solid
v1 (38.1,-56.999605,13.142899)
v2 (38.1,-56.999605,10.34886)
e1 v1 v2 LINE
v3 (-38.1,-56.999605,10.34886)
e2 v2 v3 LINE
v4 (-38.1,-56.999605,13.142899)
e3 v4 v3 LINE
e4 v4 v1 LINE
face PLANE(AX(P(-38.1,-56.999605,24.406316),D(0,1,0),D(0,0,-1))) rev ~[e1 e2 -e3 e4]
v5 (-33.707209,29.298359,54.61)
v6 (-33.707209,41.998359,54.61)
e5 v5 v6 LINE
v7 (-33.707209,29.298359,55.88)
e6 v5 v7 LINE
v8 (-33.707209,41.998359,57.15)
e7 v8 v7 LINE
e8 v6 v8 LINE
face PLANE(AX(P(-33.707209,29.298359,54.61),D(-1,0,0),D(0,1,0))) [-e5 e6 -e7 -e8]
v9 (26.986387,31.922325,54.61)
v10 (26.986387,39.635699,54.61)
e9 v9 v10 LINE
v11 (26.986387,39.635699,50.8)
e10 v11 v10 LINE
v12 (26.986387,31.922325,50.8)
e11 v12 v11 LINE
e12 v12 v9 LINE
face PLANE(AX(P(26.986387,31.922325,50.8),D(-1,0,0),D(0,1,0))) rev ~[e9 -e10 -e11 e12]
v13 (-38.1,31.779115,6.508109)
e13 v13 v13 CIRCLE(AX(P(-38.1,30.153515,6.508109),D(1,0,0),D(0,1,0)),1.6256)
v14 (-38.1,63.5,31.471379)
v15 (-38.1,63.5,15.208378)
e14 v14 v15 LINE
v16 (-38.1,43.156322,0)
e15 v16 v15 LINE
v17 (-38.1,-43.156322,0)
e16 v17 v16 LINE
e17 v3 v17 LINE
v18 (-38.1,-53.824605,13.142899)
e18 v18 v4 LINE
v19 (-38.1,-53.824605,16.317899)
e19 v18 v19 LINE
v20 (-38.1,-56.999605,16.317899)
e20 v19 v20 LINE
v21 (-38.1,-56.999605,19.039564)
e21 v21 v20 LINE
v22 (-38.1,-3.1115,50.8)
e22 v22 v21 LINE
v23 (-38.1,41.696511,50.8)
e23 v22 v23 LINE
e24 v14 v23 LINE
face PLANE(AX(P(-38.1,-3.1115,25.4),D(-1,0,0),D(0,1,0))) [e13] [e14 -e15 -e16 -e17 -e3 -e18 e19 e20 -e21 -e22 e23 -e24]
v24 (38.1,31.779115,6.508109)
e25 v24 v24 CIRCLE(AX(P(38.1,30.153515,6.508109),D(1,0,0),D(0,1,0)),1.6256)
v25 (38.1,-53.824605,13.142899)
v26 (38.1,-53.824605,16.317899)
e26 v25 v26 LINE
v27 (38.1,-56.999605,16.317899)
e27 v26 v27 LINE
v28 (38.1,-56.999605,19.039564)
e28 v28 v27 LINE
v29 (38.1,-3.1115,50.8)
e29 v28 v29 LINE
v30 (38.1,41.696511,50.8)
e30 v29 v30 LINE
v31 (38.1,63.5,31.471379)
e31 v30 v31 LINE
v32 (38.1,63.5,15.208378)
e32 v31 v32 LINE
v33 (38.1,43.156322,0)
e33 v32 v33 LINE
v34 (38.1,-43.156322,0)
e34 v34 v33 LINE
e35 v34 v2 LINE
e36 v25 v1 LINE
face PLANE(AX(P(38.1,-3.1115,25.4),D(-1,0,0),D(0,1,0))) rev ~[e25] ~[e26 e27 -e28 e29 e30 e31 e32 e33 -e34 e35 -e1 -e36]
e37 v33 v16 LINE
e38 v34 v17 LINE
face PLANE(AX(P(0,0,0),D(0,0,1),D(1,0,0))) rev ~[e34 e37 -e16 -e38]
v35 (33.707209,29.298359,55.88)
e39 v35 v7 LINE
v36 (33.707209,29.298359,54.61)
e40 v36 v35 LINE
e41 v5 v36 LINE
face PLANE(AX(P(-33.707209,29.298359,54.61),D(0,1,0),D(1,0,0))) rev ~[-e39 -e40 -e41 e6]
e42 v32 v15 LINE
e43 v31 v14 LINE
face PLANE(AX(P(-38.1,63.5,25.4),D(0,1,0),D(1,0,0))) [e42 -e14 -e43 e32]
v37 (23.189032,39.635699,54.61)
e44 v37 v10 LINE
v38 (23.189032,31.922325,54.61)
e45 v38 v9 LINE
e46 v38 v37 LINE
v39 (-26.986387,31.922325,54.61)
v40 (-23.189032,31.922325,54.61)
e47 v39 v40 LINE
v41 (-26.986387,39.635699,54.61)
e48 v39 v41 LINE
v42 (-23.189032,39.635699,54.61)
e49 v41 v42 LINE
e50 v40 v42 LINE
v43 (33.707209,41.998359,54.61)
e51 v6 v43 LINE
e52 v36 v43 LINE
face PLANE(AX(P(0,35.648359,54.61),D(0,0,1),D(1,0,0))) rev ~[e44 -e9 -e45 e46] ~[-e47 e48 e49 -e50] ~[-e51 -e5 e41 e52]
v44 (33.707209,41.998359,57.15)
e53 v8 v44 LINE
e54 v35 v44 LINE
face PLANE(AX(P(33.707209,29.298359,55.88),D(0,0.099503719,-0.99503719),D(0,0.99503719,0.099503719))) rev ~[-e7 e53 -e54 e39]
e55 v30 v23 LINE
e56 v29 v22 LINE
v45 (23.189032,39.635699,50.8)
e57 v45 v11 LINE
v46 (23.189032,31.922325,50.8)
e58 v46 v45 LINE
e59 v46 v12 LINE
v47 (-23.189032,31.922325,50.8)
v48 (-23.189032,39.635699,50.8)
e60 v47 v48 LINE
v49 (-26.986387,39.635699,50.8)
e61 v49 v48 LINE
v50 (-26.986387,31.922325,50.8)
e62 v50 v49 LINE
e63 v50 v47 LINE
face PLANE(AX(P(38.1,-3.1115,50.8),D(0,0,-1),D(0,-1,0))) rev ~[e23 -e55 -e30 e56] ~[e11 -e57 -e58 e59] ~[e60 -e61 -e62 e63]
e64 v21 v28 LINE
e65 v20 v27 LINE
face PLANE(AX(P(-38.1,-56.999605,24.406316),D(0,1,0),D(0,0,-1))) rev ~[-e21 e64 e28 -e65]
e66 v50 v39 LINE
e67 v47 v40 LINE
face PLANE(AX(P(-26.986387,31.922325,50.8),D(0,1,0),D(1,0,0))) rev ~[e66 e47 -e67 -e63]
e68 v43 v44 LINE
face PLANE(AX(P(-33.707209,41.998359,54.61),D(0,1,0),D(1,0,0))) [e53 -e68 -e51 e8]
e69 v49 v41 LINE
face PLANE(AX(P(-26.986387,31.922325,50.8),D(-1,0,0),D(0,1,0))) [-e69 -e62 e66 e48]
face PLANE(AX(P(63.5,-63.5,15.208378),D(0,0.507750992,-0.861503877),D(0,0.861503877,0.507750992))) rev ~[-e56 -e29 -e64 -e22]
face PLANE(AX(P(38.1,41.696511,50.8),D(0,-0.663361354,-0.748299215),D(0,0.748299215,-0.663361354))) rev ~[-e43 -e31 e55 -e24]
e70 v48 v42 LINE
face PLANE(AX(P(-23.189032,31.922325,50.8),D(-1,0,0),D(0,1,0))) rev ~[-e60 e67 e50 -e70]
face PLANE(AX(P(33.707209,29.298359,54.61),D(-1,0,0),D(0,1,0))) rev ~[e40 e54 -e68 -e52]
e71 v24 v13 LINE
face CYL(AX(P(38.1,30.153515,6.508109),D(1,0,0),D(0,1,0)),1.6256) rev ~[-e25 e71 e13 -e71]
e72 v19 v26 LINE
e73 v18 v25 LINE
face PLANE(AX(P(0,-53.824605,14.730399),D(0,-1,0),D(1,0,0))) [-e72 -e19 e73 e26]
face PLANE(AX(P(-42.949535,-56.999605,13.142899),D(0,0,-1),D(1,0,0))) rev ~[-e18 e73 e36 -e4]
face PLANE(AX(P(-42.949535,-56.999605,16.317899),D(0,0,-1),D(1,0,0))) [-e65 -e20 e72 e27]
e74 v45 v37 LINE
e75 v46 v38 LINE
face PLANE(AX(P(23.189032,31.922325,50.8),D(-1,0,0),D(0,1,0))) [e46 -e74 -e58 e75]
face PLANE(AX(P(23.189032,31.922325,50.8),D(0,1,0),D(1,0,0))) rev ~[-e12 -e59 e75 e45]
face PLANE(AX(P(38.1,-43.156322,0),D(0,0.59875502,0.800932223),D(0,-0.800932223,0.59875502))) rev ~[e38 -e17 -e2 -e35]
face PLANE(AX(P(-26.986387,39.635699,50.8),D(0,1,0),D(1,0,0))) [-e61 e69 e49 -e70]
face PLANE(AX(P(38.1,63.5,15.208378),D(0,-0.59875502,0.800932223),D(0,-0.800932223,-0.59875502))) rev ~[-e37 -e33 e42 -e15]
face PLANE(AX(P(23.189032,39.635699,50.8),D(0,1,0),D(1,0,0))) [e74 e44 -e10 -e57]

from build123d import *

# Parameters (mm, degrees)
F0_W      = 76.2
F0_H      = 127
F1_DEPTH  = 25.4
F2_W      = 76.2
F2_H      = 60.3884999398
F3_DEPTH  = 25.4
F5_DEPTH  = 25.4
F7_W      = 3.7973541766
F7_H      = 7.7133737504
F8_DEPTH  = 3.81
F9_W      = 67.4144178629
F9_H      = 12.7
F10_DEPTH = 2.54
F11_DEPTH = 25.4
F13_DEPTH = 119.38
F14_DEPTH = 157.988
F16_DEPTH = 160.7312
F18_DEPTH = 107.442
F19_DEPTH = 146.05
F22_DEPTH = 175.514
F23_R     = 1.6256
F24_DEPTH = 94.742
F25_W     = 85.8990699053
F25_H     = 3.175
F26_DEPTH = 3.175


with BuildPart() as f1:
    # F0 (on Top) → F1 (new body)
    with BuildSketch(Plane.XY):
        Rectangle(F0_W, F0_H)
    extrude(amount=F1_DEPTH)

    # F2 (on face) → F3 (join)
    with BuildSketch(Plane.XY.offset(25.4)):
        with Locations((0, -33.3057500301)):
            Rectangle(F2_W, F2_H)
    extrude(amount=F3_DEPTH)

    # F5 (add): a face of the model
    f5_faces = [f1.faces().sort_by_distance(p)[0] for p in [
        (0, 30.1942499699, 25.4),
    ]]
    extrude(f5_faces, amount=F5_DEPTH)

    # F7 (on face) → F8 (join)
    with BuildSketch(Plane.XY.offset(50.8)):
        with Locations((25.0877095386, 35.7790123671)):
            Rectangle(F7_W, F7_H)
        with Locations((-25.0877095386, 35.7790123671)):
            Rectangle(F7_W, F7_H)
    extrude(amount=F8_DEPTH)

    # F9 (on face) → F10 (join)
    with BuildSketch(Plane.XY.offset(54.61)):
        with Locations((0, 35.6483589858)):
            Rectangle(F9_W, F9_H)
    extrude(amount=F10_DEPTH)

    # F4 (on face) → F11 (join)
    with BuildSketch(Plane.YZ.offset(38.1)):
        Polygon((-63.5, 15.2083775029), (-3.1115000602, 50.8), (-63.5, 50.8), align=None)
    extrude(amount=F11_DEPTH)

    # F12 (on face) → F13 (cut)
    with BuildSketch(Plane.YZ.offset(63.5)):
        Polygon((-63.5, 50.8), (-63.5, 15.2083775029), (-3.1115000602, 50.8), align=None)
    extrude(amount=-F13_DEPTH, mode=Mode.SUBTRACT)

    # F6 (on face) → F14 (cut)
    with BuildSketch(Plane.YZ.offset(38.1)):
        Polygon((63.5, 50.8), (41.696511209, 50.8), (63.5, 31.4713791013), align=None)
    extrude(amount=-F14_DEPTH, mode=Mode.SUBTRACT)

    # F15 (on face) → F16 (cut)
    with BuildSketch(Plane.YZ.offset(33.7072089314)):
        Polygon((29.2983589858, 57.15), (29.2983589858, 55.88), (41.9983589858, 57.15), align=None)
    extrude(amount=-F16_DEPTH, mode=Mode.SUBTRACT)

    # F17 (on face) → F18 (cut)
    with BuildSketch(Plane.YZ.offset(38.1)):
        Polygon((-43.156321529, 0), (-63.5, 15.2083775029), (-63.5, 0), align=None)
    extrude(amount=-F18_DEPTH, mode=Mode.SUBTRACT)

    # F17 (on face) → F19 (cut)
    with BuildSketch(Plane.YZ.offset(38.1)):
        Polygon((63.5, 0), (63.5, 15.2083775029), (43.156321529, 0), align=None)
    extrude(amount=-F19_DEPTH, mode=Mode.SUBTRACT)

    # F21 (on face) → F22 (cut)
    with BuildSketch(Plane(origin=(-38.1, 0, 0), x_dir=(0, -1, 0), z_dir=(-1, 0, 0))):
        Polygon((67.4441531301, 13.2313063368), (56.999605149, 24.4063157588), (56.999605149, 6.1304802075), align=None)
    extrude(amount=-F22_DEPTH, mode=Mode.SUBTRACT)

    # F23 (on face) → F24 (cut)
    with BuildSketch(Plane.YZ.offset(38.1)):
        with Locations((30.1535148174, 6.5081091598)):
            Circle(F23_R)
    extrude(amount=-F24_DEPTH, mode=Mode.SUBTRACT)

    # F25 (on face) → F26 (cut)
    with BuildSketch(Plane.XZ.offset(56.999605149)):
        with Locations((0, 14.730398621)):
            Rectangle(F25_W, F25_H)
    extrude(amount=-F26_DEPTH, mode=Mode.SUBTRACT)


solid = f1.part
